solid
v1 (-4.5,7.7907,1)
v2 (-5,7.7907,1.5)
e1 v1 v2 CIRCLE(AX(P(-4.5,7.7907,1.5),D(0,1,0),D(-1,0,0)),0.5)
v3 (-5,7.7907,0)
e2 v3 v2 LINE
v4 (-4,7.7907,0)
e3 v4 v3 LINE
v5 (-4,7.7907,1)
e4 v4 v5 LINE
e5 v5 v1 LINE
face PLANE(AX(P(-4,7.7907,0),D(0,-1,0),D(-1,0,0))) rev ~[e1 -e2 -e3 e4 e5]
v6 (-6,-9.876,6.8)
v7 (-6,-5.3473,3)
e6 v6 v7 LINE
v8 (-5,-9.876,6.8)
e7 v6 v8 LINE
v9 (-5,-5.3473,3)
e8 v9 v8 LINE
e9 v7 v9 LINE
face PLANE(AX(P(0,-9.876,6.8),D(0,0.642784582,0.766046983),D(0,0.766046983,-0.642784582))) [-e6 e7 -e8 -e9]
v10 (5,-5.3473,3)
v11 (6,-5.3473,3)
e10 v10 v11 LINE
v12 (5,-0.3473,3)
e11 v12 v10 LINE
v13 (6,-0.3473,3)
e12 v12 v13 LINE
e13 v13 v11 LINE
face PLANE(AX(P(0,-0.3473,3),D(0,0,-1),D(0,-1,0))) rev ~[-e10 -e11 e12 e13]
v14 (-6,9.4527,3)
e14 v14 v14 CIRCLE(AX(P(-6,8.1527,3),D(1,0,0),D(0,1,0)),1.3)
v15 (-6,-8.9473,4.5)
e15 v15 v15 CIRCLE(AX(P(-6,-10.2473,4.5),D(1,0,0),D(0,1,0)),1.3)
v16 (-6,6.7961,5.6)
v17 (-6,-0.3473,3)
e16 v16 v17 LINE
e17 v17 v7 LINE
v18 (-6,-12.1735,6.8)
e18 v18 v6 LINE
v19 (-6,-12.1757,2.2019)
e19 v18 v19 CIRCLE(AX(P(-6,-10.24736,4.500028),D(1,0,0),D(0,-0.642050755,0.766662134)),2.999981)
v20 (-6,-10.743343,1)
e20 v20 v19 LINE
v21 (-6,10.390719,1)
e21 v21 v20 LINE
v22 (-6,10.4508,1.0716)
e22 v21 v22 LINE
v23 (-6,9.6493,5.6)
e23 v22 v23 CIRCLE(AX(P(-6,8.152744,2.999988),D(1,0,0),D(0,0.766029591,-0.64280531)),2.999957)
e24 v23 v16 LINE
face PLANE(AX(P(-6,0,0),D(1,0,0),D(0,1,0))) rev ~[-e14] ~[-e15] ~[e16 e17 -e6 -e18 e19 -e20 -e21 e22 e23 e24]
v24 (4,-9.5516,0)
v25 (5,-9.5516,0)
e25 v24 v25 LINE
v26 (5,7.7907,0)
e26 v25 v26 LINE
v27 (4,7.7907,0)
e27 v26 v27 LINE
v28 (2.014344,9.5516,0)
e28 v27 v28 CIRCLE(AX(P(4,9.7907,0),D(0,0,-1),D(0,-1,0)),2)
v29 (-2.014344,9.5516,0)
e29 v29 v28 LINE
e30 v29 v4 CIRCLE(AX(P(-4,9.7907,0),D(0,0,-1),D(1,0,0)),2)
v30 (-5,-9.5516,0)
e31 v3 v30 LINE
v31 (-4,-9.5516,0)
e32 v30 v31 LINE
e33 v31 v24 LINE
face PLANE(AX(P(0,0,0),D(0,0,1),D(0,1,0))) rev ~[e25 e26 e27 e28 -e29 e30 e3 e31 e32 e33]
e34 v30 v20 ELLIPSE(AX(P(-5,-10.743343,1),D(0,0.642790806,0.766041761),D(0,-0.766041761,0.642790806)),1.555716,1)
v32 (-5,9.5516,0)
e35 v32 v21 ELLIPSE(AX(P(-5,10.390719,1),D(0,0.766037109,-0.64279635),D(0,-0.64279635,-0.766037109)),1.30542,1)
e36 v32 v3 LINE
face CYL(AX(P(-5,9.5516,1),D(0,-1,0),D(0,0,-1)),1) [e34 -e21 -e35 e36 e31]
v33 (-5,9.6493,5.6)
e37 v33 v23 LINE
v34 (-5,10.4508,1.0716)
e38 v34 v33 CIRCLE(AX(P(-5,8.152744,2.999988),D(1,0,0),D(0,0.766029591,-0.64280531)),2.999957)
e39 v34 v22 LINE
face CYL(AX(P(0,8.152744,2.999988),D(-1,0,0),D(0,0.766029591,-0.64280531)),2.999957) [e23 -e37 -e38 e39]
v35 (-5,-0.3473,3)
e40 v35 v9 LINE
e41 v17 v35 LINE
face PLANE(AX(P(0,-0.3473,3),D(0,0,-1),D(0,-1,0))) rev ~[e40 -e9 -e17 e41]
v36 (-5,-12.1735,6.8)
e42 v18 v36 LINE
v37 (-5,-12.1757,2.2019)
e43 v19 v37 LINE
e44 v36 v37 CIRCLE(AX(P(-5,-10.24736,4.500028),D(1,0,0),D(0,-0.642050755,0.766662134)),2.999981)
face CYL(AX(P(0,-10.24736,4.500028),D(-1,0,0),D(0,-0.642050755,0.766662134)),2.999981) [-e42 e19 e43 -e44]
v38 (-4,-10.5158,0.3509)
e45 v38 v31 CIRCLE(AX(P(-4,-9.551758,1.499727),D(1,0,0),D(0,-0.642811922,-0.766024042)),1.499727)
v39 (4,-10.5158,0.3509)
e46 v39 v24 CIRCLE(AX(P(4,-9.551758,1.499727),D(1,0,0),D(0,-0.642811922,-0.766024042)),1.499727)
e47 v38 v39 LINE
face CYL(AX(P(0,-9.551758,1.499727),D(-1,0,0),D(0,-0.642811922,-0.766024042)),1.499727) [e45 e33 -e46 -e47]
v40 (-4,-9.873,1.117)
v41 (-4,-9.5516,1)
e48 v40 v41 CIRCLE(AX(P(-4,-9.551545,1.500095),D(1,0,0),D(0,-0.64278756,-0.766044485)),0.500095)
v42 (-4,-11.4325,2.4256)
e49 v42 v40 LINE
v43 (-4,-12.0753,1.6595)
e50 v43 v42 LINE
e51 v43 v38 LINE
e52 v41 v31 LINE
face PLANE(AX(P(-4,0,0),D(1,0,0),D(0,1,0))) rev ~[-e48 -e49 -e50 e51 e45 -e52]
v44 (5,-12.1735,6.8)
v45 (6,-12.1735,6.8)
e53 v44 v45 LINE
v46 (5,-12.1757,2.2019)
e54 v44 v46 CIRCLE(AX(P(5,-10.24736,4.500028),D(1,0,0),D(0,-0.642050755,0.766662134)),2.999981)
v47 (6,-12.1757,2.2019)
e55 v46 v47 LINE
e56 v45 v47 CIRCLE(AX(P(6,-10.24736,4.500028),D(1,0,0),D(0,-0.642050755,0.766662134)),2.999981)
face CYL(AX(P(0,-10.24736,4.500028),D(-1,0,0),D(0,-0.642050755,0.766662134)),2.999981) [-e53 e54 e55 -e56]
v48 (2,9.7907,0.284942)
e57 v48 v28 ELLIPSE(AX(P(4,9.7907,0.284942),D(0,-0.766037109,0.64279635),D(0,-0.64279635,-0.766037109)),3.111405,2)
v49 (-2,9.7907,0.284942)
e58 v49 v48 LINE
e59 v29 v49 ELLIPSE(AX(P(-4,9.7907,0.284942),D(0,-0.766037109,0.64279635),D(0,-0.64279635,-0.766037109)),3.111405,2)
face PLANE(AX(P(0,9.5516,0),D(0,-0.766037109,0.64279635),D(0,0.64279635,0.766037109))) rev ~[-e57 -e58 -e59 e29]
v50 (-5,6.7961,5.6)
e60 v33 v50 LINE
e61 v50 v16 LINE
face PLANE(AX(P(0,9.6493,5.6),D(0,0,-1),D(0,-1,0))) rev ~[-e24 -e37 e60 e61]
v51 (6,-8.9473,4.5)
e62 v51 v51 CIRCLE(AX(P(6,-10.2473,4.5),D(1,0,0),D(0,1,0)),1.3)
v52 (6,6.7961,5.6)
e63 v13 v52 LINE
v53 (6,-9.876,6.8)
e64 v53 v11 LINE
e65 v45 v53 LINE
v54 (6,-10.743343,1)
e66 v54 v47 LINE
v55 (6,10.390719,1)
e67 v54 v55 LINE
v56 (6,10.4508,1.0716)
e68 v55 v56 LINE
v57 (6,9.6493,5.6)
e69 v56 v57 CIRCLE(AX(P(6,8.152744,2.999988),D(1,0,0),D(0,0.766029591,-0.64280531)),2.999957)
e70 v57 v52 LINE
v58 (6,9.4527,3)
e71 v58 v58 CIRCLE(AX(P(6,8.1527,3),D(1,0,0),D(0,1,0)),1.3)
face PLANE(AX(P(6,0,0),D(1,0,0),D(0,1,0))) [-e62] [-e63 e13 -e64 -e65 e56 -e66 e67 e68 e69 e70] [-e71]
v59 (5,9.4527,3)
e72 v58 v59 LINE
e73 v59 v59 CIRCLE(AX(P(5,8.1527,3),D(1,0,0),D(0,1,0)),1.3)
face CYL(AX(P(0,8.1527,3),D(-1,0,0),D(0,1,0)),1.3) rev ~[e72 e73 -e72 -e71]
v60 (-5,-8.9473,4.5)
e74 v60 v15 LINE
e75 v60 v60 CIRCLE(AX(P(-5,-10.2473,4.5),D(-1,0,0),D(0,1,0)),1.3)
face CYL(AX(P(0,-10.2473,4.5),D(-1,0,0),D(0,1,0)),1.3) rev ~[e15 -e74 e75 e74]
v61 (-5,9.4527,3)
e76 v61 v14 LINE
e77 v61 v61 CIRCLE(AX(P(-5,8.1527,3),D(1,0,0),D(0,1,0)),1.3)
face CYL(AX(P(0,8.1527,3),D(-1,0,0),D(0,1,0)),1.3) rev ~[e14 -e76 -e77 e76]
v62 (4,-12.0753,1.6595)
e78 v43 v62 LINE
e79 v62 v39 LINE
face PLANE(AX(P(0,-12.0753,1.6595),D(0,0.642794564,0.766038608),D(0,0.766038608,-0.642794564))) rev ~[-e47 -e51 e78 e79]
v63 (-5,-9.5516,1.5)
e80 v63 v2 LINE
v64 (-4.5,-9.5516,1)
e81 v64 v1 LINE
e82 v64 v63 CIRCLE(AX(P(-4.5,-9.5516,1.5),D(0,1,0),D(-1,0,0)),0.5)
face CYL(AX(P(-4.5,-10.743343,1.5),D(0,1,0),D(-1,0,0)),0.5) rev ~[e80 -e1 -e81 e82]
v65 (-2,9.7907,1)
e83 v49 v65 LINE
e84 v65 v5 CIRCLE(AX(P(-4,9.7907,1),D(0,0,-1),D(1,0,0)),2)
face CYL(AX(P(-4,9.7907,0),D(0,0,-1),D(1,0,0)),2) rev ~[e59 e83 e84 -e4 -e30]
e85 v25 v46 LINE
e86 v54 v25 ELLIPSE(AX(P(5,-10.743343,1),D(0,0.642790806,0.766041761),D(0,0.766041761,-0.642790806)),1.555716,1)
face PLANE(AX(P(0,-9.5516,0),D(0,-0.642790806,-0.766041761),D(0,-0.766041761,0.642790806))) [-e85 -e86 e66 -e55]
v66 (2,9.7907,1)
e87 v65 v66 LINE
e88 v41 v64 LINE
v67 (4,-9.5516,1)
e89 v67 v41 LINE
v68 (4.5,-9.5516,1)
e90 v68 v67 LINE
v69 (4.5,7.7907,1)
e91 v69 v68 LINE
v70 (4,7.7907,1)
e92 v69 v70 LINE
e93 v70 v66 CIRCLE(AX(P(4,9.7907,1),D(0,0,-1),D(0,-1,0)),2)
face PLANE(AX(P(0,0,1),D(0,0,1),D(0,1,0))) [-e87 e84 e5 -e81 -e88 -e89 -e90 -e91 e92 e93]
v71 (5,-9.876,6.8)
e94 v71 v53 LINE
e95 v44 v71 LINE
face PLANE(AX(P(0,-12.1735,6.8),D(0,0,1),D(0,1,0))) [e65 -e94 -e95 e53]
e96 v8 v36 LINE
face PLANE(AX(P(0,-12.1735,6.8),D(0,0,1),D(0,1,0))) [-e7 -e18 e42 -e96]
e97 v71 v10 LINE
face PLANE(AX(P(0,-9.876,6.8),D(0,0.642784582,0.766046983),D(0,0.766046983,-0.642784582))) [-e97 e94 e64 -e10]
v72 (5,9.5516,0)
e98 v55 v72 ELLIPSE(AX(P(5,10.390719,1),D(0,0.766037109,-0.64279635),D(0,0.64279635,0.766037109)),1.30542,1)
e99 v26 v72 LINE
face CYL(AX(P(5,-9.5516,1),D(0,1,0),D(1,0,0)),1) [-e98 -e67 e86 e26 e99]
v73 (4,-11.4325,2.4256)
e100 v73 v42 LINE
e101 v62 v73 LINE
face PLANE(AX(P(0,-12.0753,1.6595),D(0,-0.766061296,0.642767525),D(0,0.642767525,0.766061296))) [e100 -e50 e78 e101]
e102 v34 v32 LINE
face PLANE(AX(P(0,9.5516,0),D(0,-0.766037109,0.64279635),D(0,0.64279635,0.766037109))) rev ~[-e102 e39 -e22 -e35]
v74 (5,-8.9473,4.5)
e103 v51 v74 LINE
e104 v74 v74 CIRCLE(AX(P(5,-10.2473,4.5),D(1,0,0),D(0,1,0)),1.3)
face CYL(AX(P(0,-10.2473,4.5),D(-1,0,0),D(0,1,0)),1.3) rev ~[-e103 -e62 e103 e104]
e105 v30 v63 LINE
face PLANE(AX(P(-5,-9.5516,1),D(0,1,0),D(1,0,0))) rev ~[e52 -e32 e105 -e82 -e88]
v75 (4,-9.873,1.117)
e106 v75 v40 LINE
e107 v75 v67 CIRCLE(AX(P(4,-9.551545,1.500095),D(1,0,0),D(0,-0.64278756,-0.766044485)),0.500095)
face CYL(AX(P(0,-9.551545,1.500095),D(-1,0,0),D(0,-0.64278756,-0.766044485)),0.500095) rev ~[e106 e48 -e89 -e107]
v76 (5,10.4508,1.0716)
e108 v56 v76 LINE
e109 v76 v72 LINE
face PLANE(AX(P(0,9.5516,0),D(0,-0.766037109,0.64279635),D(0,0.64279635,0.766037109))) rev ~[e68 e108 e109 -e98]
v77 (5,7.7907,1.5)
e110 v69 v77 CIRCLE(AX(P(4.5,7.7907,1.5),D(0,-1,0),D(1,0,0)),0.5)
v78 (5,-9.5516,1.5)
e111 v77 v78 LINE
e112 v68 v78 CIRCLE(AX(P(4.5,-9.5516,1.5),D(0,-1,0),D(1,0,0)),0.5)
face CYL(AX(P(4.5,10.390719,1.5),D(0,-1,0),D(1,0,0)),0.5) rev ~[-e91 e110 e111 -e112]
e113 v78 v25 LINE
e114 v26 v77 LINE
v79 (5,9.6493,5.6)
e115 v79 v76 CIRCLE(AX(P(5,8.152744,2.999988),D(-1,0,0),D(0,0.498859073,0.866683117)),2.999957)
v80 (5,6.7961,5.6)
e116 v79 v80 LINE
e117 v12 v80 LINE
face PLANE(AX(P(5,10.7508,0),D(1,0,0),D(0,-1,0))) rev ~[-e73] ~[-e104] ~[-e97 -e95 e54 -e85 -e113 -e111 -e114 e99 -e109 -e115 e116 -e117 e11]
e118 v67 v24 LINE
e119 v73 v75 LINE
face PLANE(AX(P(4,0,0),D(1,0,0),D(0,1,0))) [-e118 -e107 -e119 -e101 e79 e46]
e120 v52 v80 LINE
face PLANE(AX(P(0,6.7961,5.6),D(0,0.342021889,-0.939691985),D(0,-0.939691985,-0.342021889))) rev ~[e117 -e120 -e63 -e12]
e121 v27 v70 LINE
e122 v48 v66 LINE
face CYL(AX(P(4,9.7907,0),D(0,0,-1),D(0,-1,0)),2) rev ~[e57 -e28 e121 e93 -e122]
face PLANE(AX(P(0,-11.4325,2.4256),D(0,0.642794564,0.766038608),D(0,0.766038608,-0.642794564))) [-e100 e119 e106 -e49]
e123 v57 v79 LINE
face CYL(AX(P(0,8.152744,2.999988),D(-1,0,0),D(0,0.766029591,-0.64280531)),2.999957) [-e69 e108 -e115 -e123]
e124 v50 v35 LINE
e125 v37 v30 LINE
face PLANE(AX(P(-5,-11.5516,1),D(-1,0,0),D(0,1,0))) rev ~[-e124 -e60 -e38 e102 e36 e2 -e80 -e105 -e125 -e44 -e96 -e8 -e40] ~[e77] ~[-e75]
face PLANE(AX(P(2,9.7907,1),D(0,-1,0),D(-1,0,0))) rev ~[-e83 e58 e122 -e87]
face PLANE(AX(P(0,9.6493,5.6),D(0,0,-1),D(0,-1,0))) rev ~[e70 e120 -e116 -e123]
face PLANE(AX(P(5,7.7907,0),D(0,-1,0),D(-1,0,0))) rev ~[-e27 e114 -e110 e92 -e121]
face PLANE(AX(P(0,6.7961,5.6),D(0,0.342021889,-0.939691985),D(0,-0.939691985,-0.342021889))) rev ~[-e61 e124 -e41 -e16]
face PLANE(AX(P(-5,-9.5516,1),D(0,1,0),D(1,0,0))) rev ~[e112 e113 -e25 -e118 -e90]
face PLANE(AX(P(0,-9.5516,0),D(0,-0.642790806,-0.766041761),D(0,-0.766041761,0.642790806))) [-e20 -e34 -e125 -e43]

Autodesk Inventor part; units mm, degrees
ref_plane "YZ Plane" through (0, 0, 0) normal (1, 0, 0) x (0, 1, 0)
ref_plane "XZ Plane" through (0, 0, 0) normal (0, 1, 0) x (-1, 0, 0)
ref_plane "XY Plane" through (0, 0, 0) normal (0, 0, 1) x (1, 0, 0)
sketch "Sketch2" plane through (0, 0, 0) normal (1, 0, 0) x (0, 1, 0)
  line L0 (0, 8.1606) -> (0, -1.3601) projected
  line L1 (-18.1996, 0) -> (16.4587, 0) construction
  arc A0 (-12.1735, 6.8) -> (-12.1757, 2.2019) centre (-10.2473, 4.5) ccw
  arc A1 (10.4508, 1.0716) -> (9.6493, 5.6) centre (8.1527, 3) ccw
  circle A2 centre (8.1527, 3) radius 1.3
  circle A3 centre (-10.2473, 4.5) radius 1.3
  line L2 (-0.3473, 3) -> (-5.3473, 3)
  line L3 (-9.5516, 0) -> (-12.1757, 2.2019)
  line L4 (9.5516, 0) -> (10.4508, 1.0716)
  line L5 (-9.5516, 0) -> (9.5516, 0)
  line L6 (-9.876, 6.8) -> (-5.3473, 3)
  line L7 (9.6493, 5.6) -> (6.7961, 5.6)
  line L8 (6.7961, 5.6) -> (-0.3473, 3)
  line L9 (-12.1735, 6.8) -> (-9.876, 6.8)
  point P0 (0, 0)
  dimension "d6" = 3
  dimension "d7" = 3
  dimension "d9" = 4.5
  dimension "d10" = 18.4
  dimension "d16" = 3
  dimension "d17" = 2.6
  dimension "d36" = 40
  dimension "d37" = 6.8
  dimension "d38" = 5.6
  dimension "d39" = 8.5
  dimension "d40" = 5
  dimension "d41" = 3
  dimension "d42" = 160
  dimension "d43" = 40
extrude "Extrusion1" add sketch "Sketch2" along normal mid plane 12
shell "Shell1" thickness 1 removed faces 11 at (2, -12.3599, 2.37) at (2, 9.8602, 5.4667) at (2, 9.4358, 2.7915) at (2, -8.9642, 4.2915) at (2, -3.6807, 3) at (-2, -11.301, 1.4679) at (2, 10.1511, 0.7144) at (2, 2.0338, 3.8667) at (2, 7.7472, 5.6) at (-2, -6.8569, 4.2667) at (-2, -10.6418, 6.8)
fillet "Fillet2" radius 0.5 2 edges at (-5, -0.1763, 1) (5, -0.1763, 1)
fillet "Fillet3" radius 1 2 edges at (6, 0, 0) (-6, 0, 0)
sketch "Sketch5" plane through (6, -9.5516, 0) normal (0, 0, -1) x (-1, 0, 0)
  line L0 (1, 17.3423) -> (2, 17.3423)
  line L1 (10, 17.3423) -> (11, 17.3423)
  arc A0 (2, 17.3423) -> (4, 19.3423) centre (2, 19.3423) ccw
  arc A1 (8, 19.3423) -> (10, 17.3423) centre (10, 19.3423) ccw
  line L2 (4, 19.3423) -> (4, 20.5415)
  line L3 (4, 20.5415) -> (1, 20.5415)
  line L4 (8, 19.3423) -> (8, 20.5415)
  line L5 (8, 20.5415) -> (11, 20.5415)
  line L6 (1, 20.5415) -> (1, 17.3423)
  line L7 (11, 20.5415) -> (11, 17.3423)
  line L8 (1, -1.7876) -> (1, 20.3024) projected
  line L9 (11, 20.3024) -> (11, -1.7876) projected
  line L10 (10.5, 19.9423) -> (1.5, 19.9423) projected
  point P0 (6, -9.8516)
  dimension "d47" = 2
  dimension "d53" = 3.1991
  dimension "d54" = 3
  dimension "d55" = 3.1991
  dimension "d56" = 3
  dimension "d57" = 2
  dimension "d58" = 2.6
extrude "Extrusion4" cut sketch "Sketch5" against normal up to next
sketch "Sketch7" plane through (-4.5, -10.7434, 1) normal (0, 0, 1) x (1, 0, 0)
  line L0 (6.5, 20.5341) -> (6.5, 21.1341) projected
  line L1 (2.5, 21.1341) -> (6.5, 21.1341) projected
  line L2 (-0.5, 1.1918) -> (11.5, 1.1918) projected
  line L3 (6.5, 20.295) -> (2.5, 20.295) projected
  line L4 (-0.5, 1.1918) -> (9.5, 1.1918)
  line L5 (9.5, 1.1918) -> (9.5, -0.8082)
  line L6 (9.5, -0.8082) -> (-0.5, -0.8082)
  line L7 (-0.5, -0.8082) -> (-0.5, 1.1918)
  line L8 (-0.5, -1.4301) -> (-0.5, 0.8674) projected
  line L9 (2.5, 21.1341) -> (6.5, 21.1341)
  line L10 (6.5, 21.1341) -> (6.5, 20.5341)
  line L11 (6.5, 20.5341) -> (2.5, 20.5341)
  line L12 (2.5, 20.5341) -> (2.5, 21.1341)
  point P0 (2.5, 20.5341)
  point P1 (4.5, 10.7434)
  point P2 (9.5, -0.5959)
  dimension "d52" = 2
extrude "Extrusion5" cut sketch "Sketch7" along normal through all both and the other way through all
sketch "Sketch8" plane through (0, 0, 0) normal (1, 0, 0) x (0, 1, 0)
  line L0 (-9.5516, 1) -> (7.7907, 1) projected
  line L1 (-9.5516, 0) -> (9.5516, 0) projected
  line L2 (-12.0753, 1.6595) -> (-11.4325, 2.4256)
  line L3 (-9.5516, 1) -> (-9.5516, 0)
  line L4 (-11.4325, 2.4256) -> (-9.873, 1.117)
  arc A0 (-9.873, 1.117) -> (-9.5516, 1) centre (-9.5516, 1.5) ccw
  line L5 (-12.0753, 1.6595) -> (-10.5158, 0.3509)
  arc A1 (-10.5158, 0.3509) -> (-9.5516, 0) centre (-9.5516, 1.5) ccw
  point P0 (0, 0)
  dimension "d61" = 50
  dimension "d62" = 1
  dimension "d63" = 1.5
  dimension "d64" = 3
extrude "Extrusion6" add sketch "Sketch8" along normal mid plane 8
properties material "Steel"
